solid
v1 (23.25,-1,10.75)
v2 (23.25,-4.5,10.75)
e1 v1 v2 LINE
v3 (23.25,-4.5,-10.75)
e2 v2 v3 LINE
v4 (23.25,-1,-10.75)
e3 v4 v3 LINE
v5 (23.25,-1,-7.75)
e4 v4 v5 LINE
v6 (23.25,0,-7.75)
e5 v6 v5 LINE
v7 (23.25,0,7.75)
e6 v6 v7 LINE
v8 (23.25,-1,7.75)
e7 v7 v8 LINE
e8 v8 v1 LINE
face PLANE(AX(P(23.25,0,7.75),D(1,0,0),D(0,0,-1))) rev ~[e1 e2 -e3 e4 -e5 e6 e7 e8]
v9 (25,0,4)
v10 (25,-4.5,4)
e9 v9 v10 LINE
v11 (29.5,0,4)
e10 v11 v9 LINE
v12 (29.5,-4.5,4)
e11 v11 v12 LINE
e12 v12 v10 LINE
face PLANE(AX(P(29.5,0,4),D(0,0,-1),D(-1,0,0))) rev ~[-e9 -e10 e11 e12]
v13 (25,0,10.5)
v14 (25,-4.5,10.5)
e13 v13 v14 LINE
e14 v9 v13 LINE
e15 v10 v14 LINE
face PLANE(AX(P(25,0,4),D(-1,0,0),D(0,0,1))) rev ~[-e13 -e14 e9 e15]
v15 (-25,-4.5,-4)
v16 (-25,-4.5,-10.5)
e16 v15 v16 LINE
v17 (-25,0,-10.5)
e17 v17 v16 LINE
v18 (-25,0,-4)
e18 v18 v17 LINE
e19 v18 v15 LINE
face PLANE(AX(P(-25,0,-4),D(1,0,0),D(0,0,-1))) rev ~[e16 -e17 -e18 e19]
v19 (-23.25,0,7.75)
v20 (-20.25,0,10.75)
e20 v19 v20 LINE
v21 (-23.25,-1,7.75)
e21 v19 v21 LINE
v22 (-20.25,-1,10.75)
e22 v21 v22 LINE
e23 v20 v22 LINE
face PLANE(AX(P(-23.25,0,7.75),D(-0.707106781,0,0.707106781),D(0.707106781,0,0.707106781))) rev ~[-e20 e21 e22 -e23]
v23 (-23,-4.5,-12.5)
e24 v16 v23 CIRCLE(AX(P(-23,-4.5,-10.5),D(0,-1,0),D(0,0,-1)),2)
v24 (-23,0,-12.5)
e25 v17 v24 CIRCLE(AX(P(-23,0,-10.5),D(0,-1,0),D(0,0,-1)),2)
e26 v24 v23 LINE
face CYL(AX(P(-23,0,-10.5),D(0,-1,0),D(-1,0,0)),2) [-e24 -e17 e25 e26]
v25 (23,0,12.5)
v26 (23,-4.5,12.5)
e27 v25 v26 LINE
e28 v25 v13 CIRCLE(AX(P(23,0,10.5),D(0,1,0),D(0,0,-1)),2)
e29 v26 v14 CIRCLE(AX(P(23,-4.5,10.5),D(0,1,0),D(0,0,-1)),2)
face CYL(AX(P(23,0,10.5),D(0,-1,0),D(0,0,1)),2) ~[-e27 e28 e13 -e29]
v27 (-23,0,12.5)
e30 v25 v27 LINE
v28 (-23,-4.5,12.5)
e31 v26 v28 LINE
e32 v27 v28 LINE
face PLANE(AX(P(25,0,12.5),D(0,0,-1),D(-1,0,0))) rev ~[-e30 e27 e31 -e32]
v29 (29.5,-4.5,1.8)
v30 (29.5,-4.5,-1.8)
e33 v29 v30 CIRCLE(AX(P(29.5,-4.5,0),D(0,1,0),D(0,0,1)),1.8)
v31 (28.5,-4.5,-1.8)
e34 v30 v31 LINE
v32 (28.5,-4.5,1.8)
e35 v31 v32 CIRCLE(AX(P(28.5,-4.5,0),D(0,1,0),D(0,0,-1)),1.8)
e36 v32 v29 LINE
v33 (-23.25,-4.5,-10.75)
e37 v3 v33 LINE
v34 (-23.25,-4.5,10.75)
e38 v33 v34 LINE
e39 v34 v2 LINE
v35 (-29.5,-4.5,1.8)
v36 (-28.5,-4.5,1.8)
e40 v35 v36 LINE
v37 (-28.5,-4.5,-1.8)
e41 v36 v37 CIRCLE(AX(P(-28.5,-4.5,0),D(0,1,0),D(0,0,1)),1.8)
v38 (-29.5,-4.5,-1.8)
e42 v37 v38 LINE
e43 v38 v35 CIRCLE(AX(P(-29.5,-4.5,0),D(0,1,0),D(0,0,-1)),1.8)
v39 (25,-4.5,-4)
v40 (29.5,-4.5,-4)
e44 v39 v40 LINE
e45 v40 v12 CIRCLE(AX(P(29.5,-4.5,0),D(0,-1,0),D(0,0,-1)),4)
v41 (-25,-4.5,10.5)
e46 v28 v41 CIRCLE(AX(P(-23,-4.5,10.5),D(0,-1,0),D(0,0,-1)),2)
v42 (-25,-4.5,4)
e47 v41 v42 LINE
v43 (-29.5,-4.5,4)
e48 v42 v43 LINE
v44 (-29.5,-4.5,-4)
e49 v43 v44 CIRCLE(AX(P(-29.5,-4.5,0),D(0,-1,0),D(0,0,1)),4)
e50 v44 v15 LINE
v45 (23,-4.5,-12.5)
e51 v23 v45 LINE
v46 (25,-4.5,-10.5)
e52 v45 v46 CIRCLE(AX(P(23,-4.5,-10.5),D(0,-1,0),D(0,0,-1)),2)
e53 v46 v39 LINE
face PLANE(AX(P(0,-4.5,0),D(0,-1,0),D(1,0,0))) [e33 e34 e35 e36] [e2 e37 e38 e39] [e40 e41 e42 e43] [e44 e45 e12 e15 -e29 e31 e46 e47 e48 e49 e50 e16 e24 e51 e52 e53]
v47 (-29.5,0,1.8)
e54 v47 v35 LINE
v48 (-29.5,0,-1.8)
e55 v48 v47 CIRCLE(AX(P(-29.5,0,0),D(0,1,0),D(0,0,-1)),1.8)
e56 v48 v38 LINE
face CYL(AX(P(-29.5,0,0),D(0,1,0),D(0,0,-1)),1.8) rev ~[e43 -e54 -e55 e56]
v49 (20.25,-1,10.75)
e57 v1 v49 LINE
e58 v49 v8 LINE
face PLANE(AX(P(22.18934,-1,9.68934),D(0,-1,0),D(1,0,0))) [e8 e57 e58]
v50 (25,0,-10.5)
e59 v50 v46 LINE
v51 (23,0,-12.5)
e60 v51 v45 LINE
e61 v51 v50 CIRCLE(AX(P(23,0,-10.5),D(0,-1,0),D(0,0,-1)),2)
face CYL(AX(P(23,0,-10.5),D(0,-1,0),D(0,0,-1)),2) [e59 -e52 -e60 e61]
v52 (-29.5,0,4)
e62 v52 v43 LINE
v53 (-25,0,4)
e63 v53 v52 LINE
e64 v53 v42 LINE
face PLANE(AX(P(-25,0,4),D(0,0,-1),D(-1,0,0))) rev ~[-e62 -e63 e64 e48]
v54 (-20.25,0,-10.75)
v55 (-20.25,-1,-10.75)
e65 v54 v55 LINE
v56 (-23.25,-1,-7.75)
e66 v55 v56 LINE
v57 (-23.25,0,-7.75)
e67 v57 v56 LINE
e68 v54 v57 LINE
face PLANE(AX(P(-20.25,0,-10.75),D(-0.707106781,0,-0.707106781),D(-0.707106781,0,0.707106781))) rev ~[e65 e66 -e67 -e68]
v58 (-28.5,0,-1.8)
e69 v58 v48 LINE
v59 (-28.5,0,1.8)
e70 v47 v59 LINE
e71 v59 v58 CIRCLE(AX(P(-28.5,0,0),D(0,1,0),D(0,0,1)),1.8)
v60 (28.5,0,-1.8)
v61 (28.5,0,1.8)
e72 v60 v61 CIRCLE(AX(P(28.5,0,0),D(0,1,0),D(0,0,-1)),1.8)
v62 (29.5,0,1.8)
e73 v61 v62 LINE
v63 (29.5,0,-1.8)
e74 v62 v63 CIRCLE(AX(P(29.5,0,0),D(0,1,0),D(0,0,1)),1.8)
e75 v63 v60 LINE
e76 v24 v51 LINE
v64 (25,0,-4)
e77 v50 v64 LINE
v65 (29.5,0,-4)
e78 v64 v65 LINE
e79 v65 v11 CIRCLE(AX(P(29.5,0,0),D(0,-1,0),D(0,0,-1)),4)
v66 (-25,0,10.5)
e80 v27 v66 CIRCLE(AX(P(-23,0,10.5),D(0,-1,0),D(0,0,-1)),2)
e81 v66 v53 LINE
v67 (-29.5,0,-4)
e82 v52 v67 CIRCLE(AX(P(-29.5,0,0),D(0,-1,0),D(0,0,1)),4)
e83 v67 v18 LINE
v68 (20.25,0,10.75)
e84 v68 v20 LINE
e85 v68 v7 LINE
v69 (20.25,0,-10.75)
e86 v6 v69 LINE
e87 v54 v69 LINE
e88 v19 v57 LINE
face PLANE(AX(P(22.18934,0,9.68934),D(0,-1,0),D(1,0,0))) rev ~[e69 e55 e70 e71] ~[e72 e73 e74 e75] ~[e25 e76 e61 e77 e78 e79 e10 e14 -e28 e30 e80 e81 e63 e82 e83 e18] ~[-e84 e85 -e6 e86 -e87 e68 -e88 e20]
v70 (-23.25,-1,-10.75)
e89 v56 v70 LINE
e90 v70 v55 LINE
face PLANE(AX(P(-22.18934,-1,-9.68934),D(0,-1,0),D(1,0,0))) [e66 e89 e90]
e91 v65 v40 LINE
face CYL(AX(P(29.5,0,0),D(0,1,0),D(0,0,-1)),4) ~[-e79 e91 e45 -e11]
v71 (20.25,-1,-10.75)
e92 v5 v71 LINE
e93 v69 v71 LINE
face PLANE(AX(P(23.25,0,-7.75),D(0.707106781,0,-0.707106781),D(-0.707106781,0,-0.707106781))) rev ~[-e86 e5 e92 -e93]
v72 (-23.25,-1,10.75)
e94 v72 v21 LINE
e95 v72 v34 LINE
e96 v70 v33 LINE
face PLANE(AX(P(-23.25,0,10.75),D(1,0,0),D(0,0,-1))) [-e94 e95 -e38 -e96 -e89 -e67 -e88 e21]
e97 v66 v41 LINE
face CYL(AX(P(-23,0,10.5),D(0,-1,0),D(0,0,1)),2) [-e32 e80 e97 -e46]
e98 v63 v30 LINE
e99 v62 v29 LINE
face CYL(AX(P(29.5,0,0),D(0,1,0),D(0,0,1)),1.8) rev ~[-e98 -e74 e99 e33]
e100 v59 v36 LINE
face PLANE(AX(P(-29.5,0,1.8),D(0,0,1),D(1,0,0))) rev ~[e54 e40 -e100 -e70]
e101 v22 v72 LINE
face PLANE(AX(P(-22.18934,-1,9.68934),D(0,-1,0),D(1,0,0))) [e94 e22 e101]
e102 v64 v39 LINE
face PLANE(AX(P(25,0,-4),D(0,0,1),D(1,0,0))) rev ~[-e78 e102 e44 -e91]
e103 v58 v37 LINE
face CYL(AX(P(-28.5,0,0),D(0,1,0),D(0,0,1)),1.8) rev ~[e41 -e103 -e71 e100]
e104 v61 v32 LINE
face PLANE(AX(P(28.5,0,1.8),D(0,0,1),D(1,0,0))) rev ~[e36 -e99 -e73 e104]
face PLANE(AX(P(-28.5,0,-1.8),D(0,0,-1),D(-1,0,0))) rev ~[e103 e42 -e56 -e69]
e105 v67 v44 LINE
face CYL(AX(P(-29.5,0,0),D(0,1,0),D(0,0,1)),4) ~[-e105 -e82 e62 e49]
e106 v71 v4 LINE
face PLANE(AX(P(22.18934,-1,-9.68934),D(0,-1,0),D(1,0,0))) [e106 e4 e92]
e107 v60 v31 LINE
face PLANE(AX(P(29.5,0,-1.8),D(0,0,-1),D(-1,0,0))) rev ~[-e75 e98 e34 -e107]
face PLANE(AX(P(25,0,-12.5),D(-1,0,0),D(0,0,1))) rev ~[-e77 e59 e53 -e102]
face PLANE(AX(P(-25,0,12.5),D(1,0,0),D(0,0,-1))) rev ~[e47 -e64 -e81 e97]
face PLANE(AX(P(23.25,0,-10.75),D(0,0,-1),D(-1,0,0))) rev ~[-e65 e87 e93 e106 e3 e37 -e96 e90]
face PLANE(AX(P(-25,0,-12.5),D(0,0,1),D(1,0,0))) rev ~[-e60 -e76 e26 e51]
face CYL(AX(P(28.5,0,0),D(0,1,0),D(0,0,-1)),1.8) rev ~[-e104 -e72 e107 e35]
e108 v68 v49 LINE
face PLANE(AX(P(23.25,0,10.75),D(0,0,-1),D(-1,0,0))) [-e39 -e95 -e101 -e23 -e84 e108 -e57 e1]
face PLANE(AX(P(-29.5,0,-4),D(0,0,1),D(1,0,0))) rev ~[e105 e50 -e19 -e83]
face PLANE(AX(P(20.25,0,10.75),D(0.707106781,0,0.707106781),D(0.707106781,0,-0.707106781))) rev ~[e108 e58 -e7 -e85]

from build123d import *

# Parameters (mm, degrees)
F1_DEPTH = 4.5
F2_DEPTH = 4.501
F3_DEPTH = 1
F4_R     = 2


# Not quite as in the source:
# - a feature names something its author has since deleted; it is built from what else it names


with BuildPart() as f1:
    # F0 (on Front) → F1 (new body)
    with BuildSketch(Plane.XZ):
        Polygon((25, 12.5), (-25, 12.5), (-25, 4), (-25, -4), (-25, -12.5), (25, -12.5), (25, -4), (25, 4), align=None)
        Polygon((-23.25, 7.75), (-23.25, 10.75), (-20.25, 10.75), (20.25, 10.75), (23.25, 10.75), (23.25, 7.75), (23.25, -7.75), (23.25, -10.75), (20.25, -10.75), (-20.25, -10.75), (-23.25, -10.75), (-23.25, -7.75), align=None, mode=Mode.SUBTRACT)
        Polygon((-20.25, 10.75), (-23.25, 10.75), (-23.25, 7.75), align=None)
        Polygon((23.25, 10.75), (20.25, 10.75), (23.25, 7.75), align=None)
        with BuildLine():
            Line((-25, -4), (-25, 4))
            Line((-25, 4), (-29.5, 4))
            ThreePointArc((-29.5, 4), (-33.5, 0), (-29.5, -4))
            Line((-29.5, -4), (-25, -4))
        make_face()
        with BuildLine():
            Line((-28.5, -1.8), (-29.5, -1.8))
            ThreePointArc((-29.5, -1.8), (-31.3, 0), (-29.5, 1.8))
            Line((-29.5, 1.8), (-28.5, 1.8))
            ThreePointArc((-28.5, 1.8), (-26.7, 0), (-28.5, -1.8))
        make_face(mode=Mode.SUBTRACT)
        with BuildLine():
            Line((29.5, 4), (25, 4))
            Line((25, 4), (25, -4))
            Line((25, -4), (29.5, -4))
            ThreePointArc((29.5, -4), (33.5, 0), (29.5, 4))
        make_face()
        with BuildLine():
            ThreePointArc((29.5, 1.8), (31.3, 0), (29.5, -1.8))
            Line((29.5, -1.8), (28.5, -1.8))
            ThreePointArc((28.5, -1.8), (26.7, 0), (28.5, 1.8))
            Line((28.5, 1.8), (29.5, 1.8))
        make_face(mode=Mode.SUBTRACT)
    extrude(amount=F1_DEPTH)

    # F0 (on Front) → F2 (cut, through all)
    with BuildSketch(Plane.XZ):
        Polygon((-20.25, 10.75), (-23.25, 10.75), (-23.25, 7.75), align=None)
        Polygon((20.25, 10.75), (-20.25, 10.75), (-23.25, 7.75), (-23.25, -7.75), (-20.25, -10.75), (20.25, -10.75), (23.25, -7.75), (23.25, 7.75), align=None)
        Polygon((23.25, 10.75), (20.25, 10.75), (23.25, 7.75), align=None)
    extrude(amount=F2_DEPTH, mode=Mode.SUBTRACT)

    # F0 (on Front) → F3 (join)
    with BuildSketch(Plane.XZ):
        Polygon((23.25, 10.75), (20.25, 10.75), (23.25, 7.75), align=None)
        Polygon((23.25, -10.75), (23.25, -7.75), (20.25, -10.75), align=None)
        Polygon((-20.25, 10.75), (-23.25, 10.75), (-23.25, 7.75), align=None)
        Polygon((-20.25, -10.75), (-23.25, -7.75), (-23.25, -10.75), align=None)
    extrude(amount=F3_DEPTH)

    # F4
    f4_edges = [f1.edges().sort_by_distance(p)[0] for p in [
        (-25, -2.25, -12.5),
        (25, -2.25, -12.5),
        (25, -2.25, 12.5),
        (-25, -2.25, 12.5),
    ]]
    fillet(f4_edges, radius=F4_R)


solid = f1.part
